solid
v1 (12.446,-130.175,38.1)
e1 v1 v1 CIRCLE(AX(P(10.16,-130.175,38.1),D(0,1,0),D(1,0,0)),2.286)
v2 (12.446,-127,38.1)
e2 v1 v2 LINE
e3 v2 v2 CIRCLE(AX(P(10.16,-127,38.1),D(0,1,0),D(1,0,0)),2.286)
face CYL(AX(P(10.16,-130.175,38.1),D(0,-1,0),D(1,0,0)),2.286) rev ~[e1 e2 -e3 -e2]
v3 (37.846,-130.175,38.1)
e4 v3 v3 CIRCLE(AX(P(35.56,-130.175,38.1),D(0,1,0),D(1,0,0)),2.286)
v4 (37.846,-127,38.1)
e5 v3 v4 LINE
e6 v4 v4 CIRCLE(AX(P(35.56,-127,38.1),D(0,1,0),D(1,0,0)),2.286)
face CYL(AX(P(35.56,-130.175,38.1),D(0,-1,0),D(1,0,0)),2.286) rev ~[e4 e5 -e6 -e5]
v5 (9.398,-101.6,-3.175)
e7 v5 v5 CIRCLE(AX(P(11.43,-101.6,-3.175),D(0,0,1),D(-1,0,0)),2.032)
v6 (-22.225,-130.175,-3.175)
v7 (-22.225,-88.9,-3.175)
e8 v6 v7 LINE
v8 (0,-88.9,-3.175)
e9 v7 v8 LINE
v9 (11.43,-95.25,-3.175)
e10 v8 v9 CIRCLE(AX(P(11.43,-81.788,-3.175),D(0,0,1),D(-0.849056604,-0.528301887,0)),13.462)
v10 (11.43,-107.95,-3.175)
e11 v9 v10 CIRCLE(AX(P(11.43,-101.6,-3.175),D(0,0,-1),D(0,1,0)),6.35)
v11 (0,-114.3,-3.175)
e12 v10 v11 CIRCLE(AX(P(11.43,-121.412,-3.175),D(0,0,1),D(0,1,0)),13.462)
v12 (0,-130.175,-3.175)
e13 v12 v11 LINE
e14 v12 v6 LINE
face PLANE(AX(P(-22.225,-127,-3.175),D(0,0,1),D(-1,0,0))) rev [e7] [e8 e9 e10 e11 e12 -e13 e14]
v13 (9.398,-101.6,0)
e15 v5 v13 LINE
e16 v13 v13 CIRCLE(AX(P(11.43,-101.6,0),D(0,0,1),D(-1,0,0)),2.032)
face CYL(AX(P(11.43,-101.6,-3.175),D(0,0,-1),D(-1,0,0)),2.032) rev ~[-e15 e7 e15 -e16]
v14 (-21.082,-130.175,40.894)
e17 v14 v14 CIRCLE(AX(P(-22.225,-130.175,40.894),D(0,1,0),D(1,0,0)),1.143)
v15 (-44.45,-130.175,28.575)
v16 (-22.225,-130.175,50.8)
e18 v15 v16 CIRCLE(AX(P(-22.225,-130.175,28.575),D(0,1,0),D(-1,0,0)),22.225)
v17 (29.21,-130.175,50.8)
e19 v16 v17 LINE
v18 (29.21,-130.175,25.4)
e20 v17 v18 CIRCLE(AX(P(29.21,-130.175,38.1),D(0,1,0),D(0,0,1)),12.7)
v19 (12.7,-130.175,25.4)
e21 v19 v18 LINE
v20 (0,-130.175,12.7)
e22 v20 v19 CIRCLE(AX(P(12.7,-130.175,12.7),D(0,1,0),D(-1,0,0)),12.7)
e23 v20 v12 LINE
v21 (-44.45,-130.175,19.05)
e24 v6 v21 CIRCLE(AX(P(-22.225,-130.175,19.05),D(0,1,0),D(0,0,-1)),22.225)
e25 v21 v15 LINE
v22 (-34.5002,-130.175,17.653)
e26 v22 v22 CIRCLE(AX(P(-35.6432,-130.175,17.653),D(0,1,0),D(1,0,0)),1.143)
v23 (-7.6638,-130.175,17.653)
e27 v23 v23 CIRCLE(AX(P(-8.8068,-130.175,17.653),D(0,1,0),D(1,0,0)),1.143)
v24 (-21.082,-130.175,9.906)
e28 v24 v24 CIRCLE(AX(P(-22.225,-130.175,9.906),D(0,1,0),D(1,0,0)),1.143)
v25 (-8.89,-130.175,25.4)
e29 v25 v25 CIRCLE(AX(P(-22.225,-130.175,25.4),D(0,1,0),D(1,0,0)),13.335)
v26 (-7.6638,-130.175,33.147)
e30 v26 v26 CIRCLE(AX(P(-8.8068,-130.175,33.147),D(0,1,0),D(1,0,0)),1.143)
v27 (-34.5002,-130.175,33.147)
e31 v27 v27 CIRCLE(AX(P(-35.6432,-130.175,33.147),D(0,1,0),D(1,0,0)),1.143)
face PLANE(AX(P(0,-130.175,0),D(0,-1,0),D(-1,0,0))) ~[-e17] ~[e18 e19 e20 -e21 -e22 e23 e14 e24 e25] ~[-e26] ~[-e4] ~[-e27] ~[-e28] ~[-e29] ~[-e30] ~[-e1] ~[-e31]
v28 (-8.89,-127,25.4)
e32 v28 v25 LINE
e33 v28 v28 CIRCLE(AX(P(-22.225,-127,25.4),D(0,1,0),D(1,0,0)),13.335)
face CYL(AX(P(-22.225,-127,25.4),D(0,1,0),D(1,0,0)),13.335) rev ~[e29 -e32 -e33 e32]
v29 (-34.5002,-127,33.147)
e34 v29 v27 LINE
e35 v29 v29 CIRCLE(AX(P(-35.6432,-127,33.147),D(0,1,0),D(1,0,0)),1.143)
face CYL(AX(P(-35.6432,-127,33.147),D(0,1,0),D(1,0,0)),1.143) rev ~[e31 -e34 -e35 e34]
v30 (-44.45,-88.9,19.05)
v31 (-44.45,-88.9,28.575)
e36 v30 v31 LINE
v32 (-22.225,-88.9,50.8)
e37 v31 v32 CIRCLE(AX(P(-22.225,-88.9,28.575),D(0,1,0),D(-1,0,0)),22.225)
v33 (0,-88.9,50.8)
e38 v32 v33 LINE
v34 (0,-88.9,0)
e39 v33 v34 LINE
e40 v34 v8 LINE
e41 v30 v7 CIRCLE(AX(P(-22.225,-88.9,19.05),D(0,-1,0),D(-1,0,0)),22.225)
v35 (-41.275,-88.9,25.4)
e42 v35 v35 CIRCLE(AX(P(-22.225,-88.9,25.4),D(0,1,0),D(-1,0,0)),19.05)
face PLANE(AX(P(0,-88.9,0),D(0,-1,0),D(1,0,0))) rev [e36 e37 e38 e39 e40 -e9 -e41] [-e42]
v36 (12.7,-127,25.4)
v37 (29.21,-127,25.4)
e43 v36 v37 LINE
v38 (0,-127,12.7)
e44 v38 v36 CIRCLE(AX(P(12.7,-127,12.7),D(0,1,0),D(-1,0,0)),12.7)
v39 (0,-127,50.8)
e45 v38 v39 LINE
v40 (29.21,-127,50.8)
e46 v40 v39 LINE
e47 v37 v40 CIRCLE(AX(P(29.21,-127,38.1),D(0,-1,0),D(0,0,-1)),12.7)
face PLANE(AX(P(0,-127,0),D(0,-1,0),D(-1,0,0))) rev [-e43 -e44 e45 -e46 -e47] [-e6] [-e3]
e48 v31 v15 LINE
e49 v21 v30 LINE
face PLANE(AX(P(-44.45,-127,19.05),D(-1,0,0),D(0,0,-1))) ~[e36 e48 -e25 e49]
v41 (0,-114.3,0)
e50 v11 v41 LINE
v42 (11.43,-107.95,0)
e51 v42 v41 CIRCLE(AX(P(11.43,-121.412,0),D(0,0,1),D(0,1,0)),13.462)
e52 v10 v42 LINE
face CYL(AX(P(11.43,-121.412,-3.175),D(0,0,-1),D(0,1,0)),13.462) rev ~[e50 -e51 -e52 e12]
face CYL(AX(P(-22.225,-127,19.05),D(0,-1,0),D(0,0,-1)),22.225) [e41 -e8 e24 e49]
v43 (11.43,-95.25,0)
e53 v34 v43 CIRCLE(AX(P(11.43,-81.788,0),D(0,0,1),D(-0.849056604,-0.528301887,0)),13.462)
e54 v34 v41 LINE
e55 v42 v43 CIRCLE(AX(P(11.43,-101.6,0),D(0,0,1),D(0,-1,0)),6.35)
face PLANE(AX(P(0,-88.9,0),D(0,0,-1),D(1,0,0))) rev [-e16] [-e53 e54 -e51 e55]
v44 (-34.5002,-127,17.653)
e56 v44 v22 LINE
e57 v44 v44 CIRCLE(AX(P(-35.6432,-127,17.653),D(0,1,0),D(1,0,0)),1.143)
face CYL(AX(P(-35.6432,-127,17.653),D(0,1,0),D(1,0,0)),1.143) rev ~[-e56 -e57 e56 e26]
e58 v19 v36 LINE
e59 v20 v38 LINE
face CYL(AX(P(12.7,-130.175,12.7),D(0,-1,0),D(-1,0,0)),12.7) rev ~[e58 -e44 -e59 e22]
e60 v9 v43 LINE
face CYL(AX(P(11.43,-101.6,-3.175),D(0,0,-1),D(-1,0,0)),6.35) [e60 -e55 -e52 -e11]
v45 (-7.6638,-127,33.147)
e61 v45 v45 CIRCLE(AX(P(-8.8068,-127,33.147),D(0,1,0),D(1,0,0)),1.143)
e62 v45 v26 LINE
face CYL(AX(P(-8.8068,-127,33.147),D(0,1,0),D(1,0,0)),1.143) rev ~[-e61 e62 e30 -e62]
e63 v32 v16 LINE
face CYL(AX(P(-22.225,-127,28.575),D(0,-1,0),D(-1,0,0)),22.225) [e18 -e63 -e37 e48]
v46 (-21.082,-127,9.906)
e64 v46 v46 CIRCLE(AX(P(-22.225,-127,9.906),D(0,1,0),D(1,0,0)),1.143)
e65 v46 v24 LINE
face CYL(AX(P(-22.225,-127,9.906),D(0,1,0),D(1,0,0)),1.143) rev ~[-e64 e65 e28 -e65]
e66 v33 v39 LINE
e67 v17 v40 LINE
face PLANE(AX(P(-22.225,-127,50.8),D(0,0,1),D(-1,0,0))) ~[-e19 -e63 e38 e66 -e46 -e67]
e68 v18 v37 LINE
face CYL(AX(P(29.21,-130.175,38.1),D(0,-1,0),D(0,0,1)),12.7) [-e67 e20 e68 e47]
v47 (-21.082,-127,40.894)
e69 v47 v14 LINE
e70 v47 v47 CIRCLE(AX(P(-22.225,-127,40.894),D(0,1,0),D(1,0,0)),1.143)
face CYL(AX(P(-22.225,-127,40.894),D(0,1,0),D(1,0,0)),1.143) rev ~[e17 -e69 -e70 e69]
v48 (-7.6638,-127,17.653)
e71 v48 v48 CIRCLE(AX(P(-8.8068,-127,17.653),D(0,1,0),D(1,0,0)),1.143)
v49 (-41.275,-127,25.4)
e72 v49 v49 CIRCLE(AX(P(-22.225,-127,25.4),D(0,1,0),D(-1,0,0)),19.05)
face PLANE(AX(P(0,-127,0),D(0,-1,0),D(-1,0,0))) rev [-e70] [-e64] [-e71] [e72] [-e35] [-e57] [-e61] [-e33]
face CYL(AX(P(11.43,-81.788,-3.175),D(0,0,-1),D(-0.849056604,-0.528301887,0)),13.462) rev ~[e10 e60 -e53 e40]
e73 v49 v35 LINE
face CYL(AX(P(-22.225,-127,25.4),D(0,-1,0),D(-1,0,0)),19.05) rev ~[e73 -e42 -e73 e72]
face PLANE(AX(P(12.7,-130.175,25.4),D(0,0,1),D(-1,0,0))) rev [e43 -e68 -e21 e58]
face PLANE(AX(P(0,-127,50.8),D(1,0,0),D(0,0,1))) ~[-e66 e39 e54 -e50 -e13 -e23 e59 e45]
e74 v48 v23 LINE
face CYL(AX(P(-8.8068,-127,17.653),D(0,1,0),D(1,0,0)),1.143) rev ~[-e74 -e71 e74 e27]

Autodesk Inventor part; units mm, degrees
ref_plane "YZ Plane" through (0, 0, 0) normal (1, 0, 0) x (0, 1, 0)
ref_plane "XZ Plane" through (0, 0, 0) normal (0, 1, 0) x (-1, 0, 0)
ref_plane "XY Plane" through (0, 0, 0) normal (0, 0, 1) x (1, 0, 0)
sketch "Sketch1" plane through (0, 0, 0) normal (0, 1, 0) x (-1, 0, 0)
  line L0 (0, 0) -> (44.45, 0)
  line L1 (44.45, 0) -> (44.45, 50.8)
  line L2 (44.45, 50.8) -> (0, 50.8)
  line L3 (0, 50.8) -> (0, 0)
  circle A0 centre (22.225, 25.4) radius 19.05
  line L4 (44.45, 25.4) -> (0, 25.4) construction
  line L5 (22.225, 50.8) -> (22.225, 0) construction
  line L6 (44.45, 0) -> (44.45, -3.175)
  line L7 (44.45, -3.175) -> (0, -3.175)
  line L8 (0, -3.175) -> (0, 0)
  arc A1 (44.45, 28.575) -> (22.225, 50.8) centre (22.225, 28.575) ccw
  arc A2 (22.225, -3.175) -> (44.45, 19.05) centre (22.225, 19.05) ccw
  line L9 (22.225, -3.175) -> (22.225, 0)
  dimension "d1" = 38.1
  dimension "d2" = 50.8
  dimension "d22" = 44.45
  dimension "d37" = 3.175
extrude "Extrusion1" add sketch "Sketch1" against normal blind 38.1 contours L3 L2 A1 L1 A2 L0 | L0 L9 L7 L8 | L0 A2 L9
sketch "Sketch3" plane through (0, 0, 0) normal (0, 1, 0) x (1, 0, 0)
  line L0 (-44.45, -19.05) -> (-44.45, -28.575) projected
  line L1 (-22.225, -50.8) -> (0, -50.8) projected
  line L2 (0, -50.8) -> (0, 3.175) projected
  circle A0 centre (-22.225, -25.4) radius 19.05 projected
  circle A1 centre (-22.225, -25.4) radius 13.335
  circle A2 centre (-22.225, -9.906) radius 1.143
  circle A3 centre (-35.6432, -17.653) radius 1.143
  circle A4 centre (-35.6432, -33.147) radius 1.143
  circle A5 centre (-22.225, -40.894) radius 1.143
  circle A6 centre (-8.8068, -33.147) radius 1.143
  circle A7 centre (-8.8068, -17.653) radius 1.143
  line L3 (0, 3.175) -> (-22.225, 3.175) projected
  arc A8 (-22.225, 3.175) -> (-44.45, -19.05) centre (-22.225, -19.05) ccw projected
  arc A9 (-44.45, -28.575) -> (-22.225, -50.8) centre (-22.225, -28.575) ccw projected
  point P0 (0, 0)
  dimension "d6" = 26.67
  dimension "d7" = 2.286
  dimension "d8" = 15.494
  dimension "d11" = 360
extrude "Extrusion2" add sketch "Sketch3" along normal blind 3.175 contours A8 L3 L2 L1 A9 L0 | A0
sketch "Sketch4" plane through (0, 3.175, 0) normal (0, 1, 0) x (1, 0, 0)
  line L0 (-22.225, -50.8) -> (0, -50.8) projected
  line L1 (0, -50.8) -> (0, 3.175) projected
  line L2 (-44.45, -19.05) -> (-44.45, -28.575) projected
  circle A0 centre (-22.225, -25.4) radius 13.335 projected
  circle A1 centre (-22.225, -9.906) radius 1.143 projected
  circle A2 centre (-35.6432, -17.653) radius 1.143 projected
  circle A3 centre (-35.6432, -33.147) radius 1.143 projected
  circle A4 centre (-22.225, -40.894) radius 1.143 projected
  circle A5 centre (-8.8068, -33.147) radius 1.143 projected
  circle A6 centre (-8.8068, -17.653) radius 1.143 projected
  line L3 (0, -25.4) -> (41.91, -25.4)
  line L4 (41.91, -25.4) -> (41.91, -50.8)
  line L5 (41.91, -50.8) -> (0, -50.8)
  line L6 (0, -50.8) -> (0, -25.4)
  circle A7 centre (10.16, -38.1) radius 2.286
  circle A8 centre (35.56, -38.1) radius 2.286
  line L7 (0, -38.1) -> (41.91, -38.1) construction
  arc A9 (29.21, -50.8) -> (29.21, -25.4) centre (29.21, -38.1) ccw
  arc A10 (0, -12.7) -> (12.7, -25.4) centre (12.7, -12.7) ccw
  arc A11 (-22.225, 3.175) -> (-44.45, -19.05) centre (-22.225, -19.05) ccw projected
  arc A12 (-44.45, -28.575) -> (-22.225, -50.8) centre (-22.225, -28.575) ccw projected
  line L8 (0, 3.175) -> (-22.225, 3.175) projected
  point P0 (0, 0)
  point P1 (0, -50.8)
  dimension "d15" = 10.16
  dimension "d16" = 25.4
  dimension "d17" = 4.572
  dimension "d18" = 25.4
  dimension "d19" = 6.35
  dimension "d30" = 12.7
extrude "Extrusion3" add sketch "Sketch4" against normal blind 3.175 contours L1 L3 A9 L5 | L1 A10 L3
sketch "Sketch6" plane through (0, -38.1, -3.175) normal (0, 0, -1) x (-1, 0, 0)
  line L0 (0, 0) -> (0, 41.275) projected
  line L1 (44.45, 0) -> (0, 0) projected
  line L2 (0, 41.275) -> (44.45, 41.275) projected
  line L3 (0, 19.05) -> (-17.78, 19.05)
  line L4 (-17.78, 19.05) -> (-17.78, 6.35)
  line L5 (-17.78, 6.35) -> (0, 6.35)
  line L6 (0, 6.35) -> (0, 19.05)
  circle A0 centre (-11.43, 12.7) radius 2.032
  line L7 (0, 12.7) -> (-17.78, 12.7) construction
  circle A1 centre (-11.43, 12.7) radius 6.35
  arc A2 (0, 0) -> (-11.43, 6.35) centre (-11.43, -7.112) ccw
  line L8 (0, 0) -> (0, 41.275) projected
  arc A3 (-11.43, 19.05) -> (0, 25.4) centre (-11.43, 32.512) ccw
  line L9 (44.45, 41.275) -> (44.45, 0) projected
  point P0 (0, 38.1)
  point P1 (0, 25.4)
  dimension "d24" = 11.43
  dimension "d25" = 4.064
  dimension "d26" = 6.35
  dimension "d27" = 6.35
  dimension "d36" = 25.4
extrude "Extrusion4" add sketch "Sketch6" against normal blind 3.175 contours A2 L5 L0 | L5 A1 L3 L0 | A1 | L3 A3 L0
fillet "Fillet2" [suppressed]
ref_plane "Work Plane1" through (0, -63.5, 0) normal (0, -1, 0) x (1, 0, 0)
mirror "Mirror1" about plane through (0, -63.5, 0) normal (0, -1, 0) of "Extrusion4", "Extrusion3", "Extrusion2", "Extrusion1"
sketch "Sketch7" plane through (0, -63.5, 0) normal (0, -1, 0) x (1, 0, 0)
  line L0 (-66.3836, -28.6153) -> (65.8055, -28.6153)
  line L1 (65.8055, -28.6153) -> (65.8055, 56.7488)
  line L2 (65.8055, 56.7488) -> (-66.3836, 56.7488)
  line L3 (-66.3836, 56.7488) -> (-66.3836, -28.6153)
  point P0 (0, 0)
extrude "Extrusion5" cut sketch "Sketch7" against normal through all
properties part number "Motor Mount right_3DPrint"
